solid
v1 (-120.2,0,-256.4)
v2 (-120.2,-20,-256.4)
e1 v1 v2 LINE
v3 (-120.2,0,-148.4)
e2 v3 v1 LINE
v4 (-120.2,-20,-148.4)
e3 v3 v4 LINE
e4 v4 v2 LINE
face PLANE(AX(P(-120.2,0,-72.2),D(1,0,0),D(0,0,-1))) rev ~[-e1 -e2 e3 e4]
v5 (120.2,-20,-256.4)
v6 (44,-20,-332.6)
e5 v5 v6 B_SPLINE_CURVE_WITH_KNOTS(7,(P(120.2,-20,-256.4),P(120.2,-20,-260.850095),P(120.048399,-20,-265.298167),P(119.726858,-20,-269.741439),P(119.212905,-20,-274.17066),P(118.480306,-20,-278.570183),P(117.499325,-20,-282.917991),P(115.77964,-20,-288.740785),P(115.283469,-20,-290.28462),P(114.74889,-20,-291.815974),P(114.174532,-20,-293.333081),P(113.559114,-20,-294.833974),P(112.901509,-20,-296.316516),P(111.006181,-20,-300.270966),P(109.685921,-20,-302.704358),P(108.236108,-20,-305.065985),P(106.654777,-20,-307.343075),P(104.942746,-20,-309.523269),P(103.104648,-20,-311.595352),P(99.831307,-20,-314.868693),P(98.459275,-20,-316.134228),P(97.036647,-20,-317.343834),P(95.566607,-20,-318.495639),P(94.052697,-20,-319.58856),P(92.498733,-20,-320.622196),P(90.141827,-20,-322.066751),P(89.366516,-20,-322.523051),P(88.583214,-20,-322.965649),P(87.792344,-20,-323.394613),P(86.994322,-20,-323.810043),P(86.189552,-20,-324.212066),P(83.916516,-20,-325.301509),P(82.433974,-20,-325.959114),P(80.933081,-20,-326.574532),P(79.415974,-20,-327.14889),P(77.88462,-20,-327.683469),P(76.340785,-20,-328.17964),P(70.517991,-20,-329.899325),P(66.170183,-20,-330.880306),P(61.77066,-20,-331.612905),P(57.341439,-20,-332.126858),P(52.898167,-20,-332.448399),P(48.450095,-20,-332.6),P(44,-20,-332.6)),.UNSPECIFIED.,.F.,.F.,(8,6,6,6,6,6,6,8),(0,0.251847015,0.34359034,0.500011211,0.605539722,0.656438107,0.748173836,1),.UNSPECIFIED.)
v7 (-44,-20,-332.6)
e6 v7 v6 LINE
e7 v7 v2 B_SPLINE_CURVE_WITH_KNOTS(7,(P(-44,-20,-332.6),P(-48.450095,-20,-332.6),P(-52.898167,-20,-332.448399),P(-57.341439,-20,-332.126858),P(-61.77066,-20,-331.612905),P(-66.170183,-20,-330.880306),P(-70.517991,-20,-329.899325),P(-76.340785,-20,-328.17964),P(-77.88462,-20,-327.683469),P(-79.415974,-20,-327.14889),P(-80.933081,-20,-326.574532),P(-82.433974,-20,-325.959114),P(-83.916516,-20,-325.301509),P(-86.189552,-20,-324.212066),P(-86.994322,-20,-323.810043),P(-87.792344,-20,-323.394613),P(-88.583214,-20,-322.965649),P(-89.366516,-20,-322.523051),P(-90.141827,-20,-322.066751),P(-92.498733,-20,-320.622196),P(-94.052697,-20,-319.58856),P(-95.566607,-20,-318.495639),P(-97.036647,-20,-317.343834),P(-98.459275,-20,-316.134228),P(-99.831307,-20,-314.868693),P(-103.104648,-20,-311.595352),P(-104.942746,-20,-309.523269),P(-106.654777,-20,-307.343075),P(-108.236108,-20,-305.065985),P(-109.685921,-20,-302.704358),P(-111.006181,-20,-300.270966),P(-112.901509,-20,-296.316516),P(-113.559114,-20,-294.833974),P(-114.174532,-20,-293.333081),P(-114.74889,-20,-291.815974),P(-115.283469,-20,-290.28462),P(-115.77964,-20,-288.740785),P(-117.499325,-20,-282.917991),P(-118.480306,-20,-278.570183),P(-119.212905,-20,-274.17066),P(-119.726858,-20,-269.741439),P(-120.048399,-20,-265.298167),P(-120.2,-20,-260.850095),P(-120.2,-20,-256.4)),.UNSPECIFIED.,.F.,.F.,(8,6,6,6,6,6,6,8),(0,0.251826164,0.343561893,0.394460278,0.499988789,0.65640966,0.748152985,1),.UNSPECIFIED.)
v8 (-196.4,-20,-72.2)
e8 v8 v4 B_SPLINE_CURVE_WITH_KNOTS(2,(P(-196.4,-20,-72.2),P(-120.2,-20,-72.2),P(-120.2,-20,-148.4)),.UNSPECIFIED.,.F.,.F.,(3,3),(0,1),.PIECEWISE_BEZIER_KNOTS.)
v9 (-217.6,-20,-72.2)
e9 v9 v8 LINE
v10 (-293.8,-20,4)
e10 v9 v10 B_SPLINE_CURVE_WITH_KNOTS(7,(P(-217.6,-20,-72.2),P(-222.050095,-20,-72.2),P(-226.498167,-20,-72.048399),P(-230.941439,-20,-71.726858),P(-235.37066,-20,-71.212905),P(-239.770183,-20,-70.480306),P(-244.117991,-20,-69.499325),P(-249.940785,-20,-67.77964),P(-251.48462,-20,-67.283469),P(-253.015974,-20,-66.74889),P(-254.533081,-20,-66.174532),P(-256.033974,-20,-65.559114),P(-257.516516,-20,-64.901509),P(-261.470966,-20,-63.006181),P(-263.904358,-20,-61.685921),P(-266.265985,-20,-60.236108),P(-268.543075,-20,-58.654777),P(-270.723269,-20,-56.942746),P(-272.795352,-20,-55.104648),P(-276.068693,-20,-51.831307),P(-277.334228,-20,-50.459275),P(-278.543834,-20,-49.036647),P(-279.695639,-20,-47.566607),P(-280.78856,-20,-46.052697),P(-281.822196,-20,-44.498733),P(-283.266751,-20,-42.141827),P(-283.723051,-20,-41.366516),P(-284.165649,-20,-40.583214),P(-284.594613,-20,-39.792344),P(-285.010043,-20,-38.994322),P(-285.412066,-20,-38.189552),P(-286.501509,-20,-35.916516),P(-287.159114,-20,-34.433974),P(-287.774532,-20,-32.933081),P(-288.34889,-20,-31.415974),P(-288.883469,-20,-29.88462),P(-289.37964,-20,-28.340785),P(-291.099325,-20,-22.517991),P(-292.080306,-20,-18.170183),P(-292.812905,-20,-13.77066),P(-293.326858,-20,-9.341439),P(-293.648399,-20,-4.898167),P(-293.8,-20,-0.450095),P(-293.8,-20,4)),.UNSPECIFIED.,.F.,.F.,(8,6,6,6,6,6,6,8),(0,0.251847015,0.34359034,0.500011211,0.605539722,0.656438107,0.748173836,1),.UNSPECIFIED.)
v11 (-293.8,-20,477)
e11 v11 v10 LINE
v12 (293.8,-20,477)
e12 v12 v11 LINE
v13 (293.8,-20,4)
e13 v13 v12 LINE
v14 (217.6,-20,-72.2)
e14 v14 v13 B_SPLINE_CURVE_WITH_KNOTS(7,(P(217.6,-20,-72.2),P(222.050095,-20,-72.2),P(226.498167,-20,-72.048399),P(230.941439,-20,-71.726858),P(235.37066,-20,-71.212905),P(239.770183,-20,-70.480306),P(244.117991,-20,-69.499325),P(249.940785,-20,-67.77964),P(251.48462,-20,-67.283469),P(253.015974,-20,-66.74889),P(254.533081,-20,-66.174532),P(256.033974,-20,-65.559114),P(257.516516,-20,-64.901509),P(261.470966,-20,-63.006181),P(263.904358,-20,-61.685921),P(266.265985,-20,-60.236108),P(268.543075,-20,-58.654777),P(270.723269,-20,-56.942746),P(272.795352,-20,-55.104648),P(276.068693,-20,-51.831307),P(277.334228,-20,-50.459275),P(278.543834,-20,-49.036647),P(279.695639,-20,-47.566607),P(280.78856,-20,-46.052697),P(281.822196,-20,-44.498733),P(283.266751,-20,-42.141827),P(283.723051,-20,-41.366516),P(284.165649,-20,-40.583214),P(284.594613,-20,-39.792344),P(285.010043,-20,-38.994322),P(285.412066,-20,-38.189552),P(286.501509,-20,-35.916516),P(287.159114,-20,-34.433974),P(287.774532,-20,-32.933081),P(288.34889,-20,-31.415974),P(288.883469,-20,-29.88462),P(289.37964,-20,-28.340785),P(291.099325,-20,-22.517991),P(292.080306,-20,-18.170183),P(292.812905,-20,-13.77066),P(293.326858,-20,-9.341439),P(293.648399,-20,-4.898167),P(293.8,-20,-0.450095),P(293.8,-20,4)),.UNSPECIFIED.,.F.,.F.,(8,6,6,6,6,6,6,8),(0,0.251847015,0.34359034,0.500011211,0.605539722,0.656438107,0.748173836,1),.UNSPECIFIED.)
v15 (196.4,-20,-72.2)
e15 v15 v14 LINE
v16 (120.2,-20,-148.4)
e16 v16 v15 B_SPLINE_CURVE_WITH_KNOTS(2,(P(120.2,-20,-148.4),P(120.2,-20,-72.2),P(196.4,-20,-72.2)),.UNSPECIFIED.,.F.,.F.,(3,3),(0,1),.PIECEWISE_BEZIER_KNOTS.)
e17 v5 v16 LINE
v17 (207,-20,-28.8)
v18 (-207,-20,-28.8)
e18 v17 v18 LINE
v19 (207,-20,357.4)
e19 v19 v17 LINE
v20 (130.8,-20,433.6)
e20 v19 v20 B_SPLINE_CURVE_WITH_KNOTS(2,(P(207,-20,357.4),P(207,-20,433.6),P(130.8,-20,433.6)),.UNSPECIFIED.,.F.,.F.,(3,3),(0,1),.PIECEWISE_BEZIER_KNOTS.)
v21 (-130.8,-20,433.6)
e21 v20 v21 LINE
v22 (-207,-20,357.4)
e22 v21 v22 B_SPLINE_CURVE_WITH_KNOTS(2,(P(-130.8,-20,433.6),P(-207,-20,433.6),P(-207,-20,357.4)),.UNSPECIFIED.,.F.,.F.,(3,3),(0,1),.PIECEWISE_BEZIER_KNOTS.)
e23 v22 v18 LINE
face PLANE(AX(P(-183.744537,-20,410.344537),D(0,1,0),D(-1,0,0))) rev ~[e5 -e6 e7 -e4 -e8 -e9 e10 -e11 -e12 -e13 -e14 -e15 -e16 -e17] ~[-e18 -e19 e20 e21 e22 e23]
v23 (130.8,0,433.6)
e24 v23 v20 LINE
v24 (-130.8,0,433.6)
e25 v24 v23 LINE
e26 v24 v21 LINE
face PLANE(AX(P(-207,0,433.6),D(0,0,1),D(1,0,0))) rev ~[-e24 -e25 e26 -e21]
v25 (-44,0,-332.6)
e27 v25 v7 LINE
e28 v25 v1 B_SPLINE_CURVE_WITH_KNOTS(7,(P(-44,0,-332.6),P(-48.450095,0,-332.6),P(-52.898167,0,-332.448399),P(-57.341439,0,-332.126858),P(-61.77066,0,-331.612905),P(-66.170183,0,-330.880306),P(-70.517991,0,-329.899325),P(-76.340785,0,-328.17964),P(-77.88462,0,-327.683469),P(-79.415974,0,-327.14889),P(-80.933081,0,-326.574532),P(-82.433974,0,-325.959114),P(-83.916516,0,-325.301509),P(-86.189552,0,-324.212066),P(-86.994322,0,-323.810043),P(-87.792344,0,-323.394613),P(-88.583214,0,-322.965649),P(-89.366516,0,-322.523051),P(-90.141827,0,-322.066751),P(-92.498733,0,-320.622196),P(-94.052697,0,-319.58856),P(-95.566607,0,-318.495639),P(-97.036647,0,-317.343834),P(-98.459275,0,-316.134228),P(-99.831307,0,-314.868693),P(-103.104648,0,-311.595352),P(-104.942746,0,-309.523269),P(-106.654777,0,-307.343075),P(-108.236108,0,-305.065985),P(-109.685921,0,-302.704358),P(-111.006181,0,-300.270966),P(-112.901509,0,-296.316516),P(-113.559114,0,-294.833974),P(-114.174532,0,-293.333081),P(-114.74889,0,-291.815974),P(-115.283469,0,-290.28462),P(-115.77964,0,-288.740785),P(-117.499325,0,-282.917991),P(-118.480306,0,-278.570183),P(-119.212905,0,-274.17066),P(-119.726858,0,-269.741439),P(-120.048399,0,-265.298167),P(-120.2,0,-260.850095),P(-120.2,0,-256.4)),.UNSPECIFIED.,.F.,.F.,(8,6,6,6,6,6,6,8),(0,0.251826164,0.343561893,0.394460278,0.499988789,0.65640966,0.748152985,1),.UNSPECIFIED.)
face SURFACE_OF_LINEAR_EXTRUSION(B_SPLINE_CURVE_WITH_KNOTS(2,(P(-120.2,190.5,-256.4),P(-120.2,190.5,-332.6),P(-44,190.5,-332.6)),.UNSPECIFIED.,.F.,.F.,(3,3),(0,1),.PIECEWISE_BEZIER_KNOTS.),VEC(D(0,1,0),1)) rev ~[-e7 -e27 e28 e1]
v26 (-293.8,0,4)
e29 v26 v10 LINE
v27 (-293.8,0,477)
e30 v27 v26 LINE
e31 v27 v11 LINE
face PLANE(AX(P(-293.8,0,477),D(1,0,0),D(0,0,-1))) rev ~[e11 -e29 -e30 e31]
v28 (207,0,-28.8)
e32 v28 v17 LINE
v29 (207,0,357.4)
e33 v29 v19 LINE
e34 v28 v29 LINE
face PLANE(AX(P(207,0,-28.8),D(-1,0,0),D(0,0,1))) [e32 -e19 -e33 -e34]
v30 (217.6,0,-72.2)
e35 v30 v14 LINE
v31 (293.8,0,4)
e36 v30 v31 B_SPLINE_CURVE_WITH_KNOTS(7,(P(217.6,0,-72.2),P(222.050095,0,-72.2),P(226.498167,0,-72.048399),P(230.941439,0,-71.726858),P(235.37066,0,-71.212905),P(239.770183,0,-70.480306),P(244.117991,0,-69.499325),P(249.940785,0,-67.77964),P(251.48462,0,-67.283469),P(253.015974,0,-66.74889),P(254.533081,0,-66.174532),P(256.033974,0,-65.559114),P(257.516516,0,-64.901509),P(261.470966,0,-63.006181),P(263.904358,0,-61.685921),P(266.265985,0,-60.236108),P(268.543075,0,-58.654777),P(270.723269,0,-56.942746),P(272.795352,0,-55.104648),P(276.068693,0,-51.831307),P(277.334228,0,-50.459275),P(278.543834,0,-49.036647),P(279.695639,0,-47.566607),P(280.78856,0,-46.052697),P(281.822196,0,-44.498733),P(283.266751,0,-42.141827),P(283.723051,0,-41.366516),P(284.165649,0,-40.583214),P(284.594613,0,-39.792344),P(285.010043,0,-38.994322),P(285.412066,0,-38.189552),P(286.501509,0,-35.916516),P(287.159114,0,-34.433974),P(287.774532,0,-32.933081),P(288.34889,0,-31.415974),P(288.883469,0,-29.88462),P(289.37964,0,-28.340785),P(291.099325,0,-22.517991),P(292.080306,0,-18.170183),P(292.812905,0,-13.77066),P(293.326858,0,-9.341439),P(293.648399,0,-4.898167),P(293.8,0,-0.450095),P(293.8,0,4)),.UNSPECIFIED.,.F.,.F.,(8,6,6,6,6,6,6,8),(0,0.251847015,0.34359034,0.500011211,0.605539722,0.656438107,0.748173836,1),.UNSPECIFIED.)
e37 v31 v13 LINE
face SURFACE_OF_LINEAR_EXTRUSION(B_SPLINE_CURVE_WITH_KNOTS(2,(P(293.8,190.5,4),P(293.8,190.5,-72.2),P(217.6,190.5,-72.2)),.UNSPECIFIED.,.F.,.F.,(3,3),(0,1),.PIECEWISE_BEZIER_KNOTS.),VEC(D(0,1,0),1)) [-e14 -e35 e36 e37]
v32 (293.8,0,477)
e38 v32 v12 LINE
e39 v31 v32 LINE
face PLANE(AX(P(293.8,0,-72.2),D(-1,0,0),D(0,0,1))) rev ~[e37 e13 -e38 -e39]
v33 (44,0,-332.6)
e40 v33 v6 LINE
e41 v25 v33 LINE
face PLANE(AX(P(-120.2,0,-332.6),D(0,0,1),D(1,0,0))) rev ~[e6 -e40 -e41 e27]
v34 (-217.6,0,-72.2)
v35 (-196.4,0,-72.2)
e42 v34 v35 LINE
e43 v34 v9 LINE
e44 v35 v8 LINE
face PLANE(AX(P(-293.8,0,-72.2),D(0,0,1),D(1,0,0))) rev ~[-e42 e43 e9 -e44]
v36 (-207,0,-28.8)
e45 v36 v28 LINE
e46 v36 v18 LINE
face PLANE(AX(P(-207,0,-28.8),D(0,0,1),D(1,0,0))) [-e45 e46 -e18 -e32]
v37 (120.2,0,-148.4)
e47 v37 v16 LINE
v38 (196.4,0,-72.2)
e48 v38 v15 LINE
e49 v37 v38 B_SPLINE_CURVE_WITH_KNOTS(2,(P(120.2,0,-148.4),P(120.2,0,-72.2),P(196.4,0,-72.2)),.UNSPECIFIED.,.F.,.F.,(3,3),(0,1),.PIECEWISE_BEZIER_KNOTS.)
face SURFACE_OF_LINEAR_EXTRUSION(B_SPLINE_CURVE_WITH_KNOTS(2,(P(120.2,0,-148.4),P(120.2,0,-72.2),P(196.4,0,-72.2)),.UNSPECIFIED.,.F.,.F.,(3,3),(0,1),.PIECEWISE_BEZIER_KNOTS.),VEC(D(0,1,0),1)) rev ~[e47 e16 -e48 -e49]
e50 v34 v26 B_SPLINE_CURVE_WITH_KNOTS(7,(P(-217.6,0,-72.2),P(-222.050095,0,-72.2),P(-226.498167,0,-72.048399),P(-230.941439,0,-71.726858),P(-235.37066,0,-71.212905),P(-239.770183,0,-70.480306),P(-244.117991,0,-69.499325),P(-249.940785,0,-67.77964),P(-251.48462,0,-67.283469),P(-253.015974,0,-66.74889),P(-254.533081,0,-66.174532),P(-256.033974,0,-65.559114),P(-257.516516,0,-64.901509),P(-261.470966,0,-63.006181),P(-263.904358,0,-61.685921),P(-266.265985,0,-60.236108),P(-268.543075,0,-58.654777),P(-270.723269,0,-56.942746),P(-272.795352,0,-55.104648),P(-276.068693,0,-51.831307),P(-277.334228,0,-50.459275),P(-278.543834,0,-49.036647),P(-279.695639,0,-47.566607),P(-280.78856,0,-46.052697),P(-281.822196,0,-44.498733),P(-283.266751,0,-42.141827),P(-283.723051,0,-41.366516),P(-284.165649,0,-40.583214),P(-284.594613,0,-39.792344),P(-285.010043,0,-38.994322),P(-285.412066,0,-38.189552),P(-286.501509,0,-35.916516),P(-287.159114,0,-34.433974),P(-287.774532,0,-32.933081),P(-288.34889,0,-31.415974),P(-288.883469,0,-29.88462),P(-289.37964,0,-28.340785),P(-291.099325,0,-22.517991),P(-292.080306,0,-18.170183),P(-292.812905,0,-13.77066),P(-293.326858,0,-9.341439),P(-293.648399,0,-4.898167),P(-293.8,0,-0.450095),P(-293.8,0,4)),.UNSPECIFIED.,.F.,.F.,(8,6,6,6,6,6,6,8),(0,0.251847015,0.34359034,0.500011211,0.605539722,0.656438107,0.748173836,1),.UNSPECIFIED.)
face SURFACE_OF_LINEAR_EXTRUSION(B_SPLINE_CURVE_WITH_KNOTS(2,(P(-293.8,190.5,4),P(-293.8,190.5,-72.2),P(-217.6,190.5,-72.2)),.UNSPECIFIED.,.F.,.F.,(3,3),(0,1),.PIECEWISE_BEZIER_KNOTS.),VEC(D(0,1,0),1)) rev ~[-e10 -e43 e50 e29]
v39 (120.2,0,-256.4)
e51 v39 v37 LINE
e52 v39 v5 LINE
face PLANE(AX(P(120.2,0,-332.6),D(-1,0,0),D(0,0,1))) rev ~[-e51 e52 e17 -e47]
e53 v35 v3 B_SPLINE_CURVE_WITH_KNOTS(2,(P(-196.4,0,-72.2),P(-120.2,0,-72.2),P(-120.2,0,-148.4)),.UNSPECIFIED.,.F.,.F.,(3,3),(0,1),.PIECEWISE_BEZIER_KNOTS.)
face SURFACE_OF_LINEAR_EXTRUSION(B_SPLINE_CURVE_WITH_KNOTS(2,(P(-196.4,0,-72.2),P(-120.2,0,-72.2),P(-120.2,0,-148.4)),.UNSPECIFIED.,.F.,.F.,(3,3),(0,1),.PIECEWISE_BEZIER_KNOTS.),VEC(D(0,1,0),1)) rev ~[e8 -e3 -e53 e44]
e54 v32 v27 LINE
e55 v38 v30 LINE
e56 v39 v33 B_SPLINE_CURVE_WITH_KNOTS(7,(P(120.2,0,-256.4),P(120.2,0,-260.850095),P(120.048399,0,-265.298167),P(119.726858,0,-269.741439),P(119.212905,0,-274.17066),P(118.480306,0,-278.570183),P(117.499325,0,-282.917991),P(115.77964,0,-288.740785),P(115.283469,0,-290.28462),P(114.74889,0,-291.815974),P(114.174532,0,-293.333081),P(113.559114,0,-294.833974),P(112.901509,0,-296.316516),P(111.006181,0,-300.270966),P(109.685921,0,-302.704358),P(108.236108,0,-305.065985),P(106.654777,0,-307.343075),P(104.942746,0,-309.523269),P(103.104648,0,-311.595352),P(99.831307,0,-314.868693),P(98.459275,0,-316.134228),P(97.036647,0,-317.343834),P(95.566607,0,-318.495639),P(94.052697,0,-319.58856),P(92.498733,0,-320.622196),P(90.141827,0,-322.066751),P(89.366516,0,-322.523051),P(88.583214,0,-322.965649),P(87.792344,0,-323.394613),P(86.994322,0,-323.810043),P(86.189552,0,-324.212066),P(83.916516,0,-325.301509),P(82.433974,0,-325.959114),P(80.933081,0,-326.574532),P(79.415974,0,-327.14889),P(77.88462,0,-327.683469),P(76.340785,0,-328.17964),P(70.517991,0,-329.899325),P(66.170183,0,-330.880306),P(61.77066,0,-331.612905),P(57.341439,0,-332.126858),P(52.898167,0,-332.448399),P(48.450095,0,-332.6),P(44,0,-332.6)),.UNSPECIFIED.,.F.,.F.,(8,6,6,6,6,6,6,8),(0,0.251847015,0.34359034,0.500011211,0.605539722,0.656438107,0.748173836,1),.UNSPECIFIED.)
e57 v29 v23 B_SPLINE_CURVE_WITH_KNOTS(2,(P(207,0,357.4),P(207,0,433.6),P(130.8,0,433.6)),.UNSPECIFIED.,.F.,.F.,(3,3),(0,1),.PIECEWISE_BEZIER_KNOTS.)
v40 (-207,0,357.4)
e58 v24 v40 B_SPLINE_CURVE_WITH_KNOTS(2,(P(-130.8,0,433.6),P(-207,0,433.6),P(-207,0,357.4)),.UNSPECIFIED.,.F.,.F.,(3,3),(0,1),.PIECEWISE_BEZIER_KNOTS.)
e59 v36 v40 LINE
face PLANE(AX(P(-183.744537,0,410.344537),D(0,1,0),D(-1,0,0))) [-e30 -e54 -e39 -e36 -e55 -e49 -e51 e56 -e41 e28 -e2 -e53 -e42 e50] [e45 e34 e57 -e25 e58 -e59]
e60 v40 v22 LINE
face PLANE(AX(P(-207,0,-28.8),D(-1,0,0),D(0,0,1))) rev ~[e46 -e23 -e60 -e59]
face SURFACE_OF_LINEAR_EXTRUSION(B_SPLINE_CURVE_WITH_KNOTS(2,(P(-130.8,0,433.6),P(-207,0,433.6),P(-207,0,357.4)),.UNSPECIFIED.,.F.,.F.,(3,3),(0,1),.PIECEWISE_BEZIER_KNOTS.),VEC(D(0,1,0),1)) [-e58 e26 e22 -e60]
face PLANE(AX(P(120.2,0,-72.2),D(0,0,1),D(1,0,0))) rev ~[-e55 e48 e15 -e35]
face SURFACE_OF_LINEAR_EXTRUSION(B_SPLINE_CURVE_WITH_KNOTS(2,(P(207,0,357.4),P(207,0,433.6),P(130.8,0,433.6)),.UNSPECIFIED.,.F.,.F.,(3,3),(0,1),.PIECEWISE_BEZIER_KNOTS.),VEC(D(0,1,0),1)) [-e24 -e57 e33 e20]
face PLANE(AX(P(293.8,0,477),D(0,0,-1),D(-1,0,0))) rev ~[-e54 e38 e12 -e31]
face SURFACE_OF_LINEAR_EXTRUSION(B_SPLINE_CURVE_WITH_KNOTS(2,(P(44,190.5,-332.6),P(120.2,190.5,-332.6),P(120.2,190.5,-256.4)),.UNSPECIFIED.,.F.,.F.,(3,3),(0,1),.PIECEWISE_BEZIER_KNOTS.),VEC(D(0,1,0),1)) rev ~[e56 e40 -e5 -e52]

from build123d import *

# Parameters (mm, degrees)
F1_DEPTH    = 20
F2_T1_DEPTH = 20
F2_T3_DEPTH = 401
F3_W        = 414
F3_H        = 462.4
F4_DEPTH    = 25.4
F5_T1_DEPTH = 20


# Not quite as in the source:
# - a fillet or chamfer that OpenCascade refuses, or shapes differently, is made with other operations: its cross-section is extruded or revolved along the edge and cut away or added


with BuildPart() as f1:
    # F0 (on Front) → F1 (new body)
    with BuildSketch(Plane.XZ):
        Polygon((293.8, 477), (-293.8, 477), (-293.8, -72.2), (-120.2, -72.2), (-120.2, -332.6), (120.2, -332.6), (120.2, -72.2), (293.8, -72.2), align=None)
    extrude(amount=F1_DEPTH)

    # F2: fillet of radius 76.2 on 6 edges, made by hand

    # F2_s2 → F2_t1 (join)
    with BuildSketch(Plane.XZ):
        with BuildLine():
            add(Edge.make_bspline(
                [(-196.4, -72.2), (-120.2, -72.2), (-120.2, -148.4)],
                knots=[0, 0, 0, 1, 1, 1], degree=2, weights=[1, 1, 1]))
            Line((-120.2, -148.4), (-120.2, -72.2))
            Line((-120.2, -72.2), (-196.4, -72.2))
        make_face()
        with BuildLine():
            add(Edge.make_bspline(
                [(120.2, -148.4), (120.2, -72.2), (196.4, -72.2)],
                knots=[0, 0, 0, 1, 1, 1], degree=2, weights=[1, 1, 1]))
            Line((196.4, -72.2), (120.2, -72.2))
            Line((120.2, -72.2), (120.2, -148.4))
        make_face()
    extrude(amount=F2_T1_DEPTH)

    # F2_s4 → F2_t3 (cut)
    with BuildSketch(Plane.XZ.offset(-190.5)):
        with BuildLine():
            add(Edge.make_bspline(
                [(-293.8, 4), (-293.8, -72.2), (-217.6, -72.2)],
                knots=[0, 0, 0, 1, 1, 1], degree=2, weights=[1, 1, 1]))
            Line((-217.6, -72.2), (-293.8, -72.2))
            Line((-293.8, -72.2), (-293.8, 4))
        make_face()
        with BuildLine():
            add(Edge.make_bspline(
                [(44, -332.6), (120.2, -332.6), (120.2, -256.4)],
                knots=[0, 0, 0, 1, 1, 1], degree=2, weights=[1, 1, 1]))
            Line((120.2, -256.4), (120.2, -332.6))
            Line((120.2, -332.6), (44, -332.6))
        make_face()
        with BuildLine():
            add(Edge.make_bspline(
                [(293.8, 4), (293.8, -72.2), (217.6, -72.2)],
                knots=[0, 0, 0, 1, 1, 1], degree=2, weights=[1, 1, 1]))
            Line((217.6, -72.2), (293.8, -72.2))
            Line((293.8, -72.2), (293.8, 4))
        make_face()
        with BuildLine():
            add(Edge.make_bspline(
                [(-120.2, -256.4), (-120.2, -332.6), (-44, -332.6)],
                knots=[0, 0, 0, 1, 1, 1], degree=2, weights=[1, 1, 1]))
            Line((-44, -332.6), (-120.2, -332.6))
            Line((-120.2, -332.6), (-120.2, -256.4))
        make_face()
    extrude(amount=F2_T3_DEPTH, mode=Mode.SUBTRACT)

    # F3 (on Front) → F4 (cut)
    with BuildSketch(Plane.XZ):
        with Locations((0, 202.4)):
            Rectangle(F3_W, F3_H)
    extrude(amount=F4_DEPTH, mode=Mode.SUBTRACT)

    # F5: fillet of radius 76.2 on 2 edges, made by hand

    # F5_s2 → F5_t1 (join)
    with BuildSketch(Plane.XZ):
        with BuildLine():
            add(Edge.make_bspline(
                [(-130.8, 433.6), (-207, 433.6), (-207, 357.4)],
                knots=[0, 0, 0, 1, 1, 1], degree=2, weights=[1, 1, 1]))
            Line((-207, 357.4), (-207, 433.6))
            Line((-207, 433.6), (-130.8, 433.6))
        make_face()
        with BuildLine():
            add(Edge.make_bspline(
                [(207, 357.4), (207, 433.6), (130.8, 433.6)],
                knots=[0, 0, 0, 1, 1, 1], degree=2, weights=[1, 1, 1]))
            Line((130.8, 433.6), (207, 433.6))
            Line((207, 433.6), (207, 357.4))
        make_face()
    extrude(amount=F5_T1_DEPTH)


solid = f1.part
